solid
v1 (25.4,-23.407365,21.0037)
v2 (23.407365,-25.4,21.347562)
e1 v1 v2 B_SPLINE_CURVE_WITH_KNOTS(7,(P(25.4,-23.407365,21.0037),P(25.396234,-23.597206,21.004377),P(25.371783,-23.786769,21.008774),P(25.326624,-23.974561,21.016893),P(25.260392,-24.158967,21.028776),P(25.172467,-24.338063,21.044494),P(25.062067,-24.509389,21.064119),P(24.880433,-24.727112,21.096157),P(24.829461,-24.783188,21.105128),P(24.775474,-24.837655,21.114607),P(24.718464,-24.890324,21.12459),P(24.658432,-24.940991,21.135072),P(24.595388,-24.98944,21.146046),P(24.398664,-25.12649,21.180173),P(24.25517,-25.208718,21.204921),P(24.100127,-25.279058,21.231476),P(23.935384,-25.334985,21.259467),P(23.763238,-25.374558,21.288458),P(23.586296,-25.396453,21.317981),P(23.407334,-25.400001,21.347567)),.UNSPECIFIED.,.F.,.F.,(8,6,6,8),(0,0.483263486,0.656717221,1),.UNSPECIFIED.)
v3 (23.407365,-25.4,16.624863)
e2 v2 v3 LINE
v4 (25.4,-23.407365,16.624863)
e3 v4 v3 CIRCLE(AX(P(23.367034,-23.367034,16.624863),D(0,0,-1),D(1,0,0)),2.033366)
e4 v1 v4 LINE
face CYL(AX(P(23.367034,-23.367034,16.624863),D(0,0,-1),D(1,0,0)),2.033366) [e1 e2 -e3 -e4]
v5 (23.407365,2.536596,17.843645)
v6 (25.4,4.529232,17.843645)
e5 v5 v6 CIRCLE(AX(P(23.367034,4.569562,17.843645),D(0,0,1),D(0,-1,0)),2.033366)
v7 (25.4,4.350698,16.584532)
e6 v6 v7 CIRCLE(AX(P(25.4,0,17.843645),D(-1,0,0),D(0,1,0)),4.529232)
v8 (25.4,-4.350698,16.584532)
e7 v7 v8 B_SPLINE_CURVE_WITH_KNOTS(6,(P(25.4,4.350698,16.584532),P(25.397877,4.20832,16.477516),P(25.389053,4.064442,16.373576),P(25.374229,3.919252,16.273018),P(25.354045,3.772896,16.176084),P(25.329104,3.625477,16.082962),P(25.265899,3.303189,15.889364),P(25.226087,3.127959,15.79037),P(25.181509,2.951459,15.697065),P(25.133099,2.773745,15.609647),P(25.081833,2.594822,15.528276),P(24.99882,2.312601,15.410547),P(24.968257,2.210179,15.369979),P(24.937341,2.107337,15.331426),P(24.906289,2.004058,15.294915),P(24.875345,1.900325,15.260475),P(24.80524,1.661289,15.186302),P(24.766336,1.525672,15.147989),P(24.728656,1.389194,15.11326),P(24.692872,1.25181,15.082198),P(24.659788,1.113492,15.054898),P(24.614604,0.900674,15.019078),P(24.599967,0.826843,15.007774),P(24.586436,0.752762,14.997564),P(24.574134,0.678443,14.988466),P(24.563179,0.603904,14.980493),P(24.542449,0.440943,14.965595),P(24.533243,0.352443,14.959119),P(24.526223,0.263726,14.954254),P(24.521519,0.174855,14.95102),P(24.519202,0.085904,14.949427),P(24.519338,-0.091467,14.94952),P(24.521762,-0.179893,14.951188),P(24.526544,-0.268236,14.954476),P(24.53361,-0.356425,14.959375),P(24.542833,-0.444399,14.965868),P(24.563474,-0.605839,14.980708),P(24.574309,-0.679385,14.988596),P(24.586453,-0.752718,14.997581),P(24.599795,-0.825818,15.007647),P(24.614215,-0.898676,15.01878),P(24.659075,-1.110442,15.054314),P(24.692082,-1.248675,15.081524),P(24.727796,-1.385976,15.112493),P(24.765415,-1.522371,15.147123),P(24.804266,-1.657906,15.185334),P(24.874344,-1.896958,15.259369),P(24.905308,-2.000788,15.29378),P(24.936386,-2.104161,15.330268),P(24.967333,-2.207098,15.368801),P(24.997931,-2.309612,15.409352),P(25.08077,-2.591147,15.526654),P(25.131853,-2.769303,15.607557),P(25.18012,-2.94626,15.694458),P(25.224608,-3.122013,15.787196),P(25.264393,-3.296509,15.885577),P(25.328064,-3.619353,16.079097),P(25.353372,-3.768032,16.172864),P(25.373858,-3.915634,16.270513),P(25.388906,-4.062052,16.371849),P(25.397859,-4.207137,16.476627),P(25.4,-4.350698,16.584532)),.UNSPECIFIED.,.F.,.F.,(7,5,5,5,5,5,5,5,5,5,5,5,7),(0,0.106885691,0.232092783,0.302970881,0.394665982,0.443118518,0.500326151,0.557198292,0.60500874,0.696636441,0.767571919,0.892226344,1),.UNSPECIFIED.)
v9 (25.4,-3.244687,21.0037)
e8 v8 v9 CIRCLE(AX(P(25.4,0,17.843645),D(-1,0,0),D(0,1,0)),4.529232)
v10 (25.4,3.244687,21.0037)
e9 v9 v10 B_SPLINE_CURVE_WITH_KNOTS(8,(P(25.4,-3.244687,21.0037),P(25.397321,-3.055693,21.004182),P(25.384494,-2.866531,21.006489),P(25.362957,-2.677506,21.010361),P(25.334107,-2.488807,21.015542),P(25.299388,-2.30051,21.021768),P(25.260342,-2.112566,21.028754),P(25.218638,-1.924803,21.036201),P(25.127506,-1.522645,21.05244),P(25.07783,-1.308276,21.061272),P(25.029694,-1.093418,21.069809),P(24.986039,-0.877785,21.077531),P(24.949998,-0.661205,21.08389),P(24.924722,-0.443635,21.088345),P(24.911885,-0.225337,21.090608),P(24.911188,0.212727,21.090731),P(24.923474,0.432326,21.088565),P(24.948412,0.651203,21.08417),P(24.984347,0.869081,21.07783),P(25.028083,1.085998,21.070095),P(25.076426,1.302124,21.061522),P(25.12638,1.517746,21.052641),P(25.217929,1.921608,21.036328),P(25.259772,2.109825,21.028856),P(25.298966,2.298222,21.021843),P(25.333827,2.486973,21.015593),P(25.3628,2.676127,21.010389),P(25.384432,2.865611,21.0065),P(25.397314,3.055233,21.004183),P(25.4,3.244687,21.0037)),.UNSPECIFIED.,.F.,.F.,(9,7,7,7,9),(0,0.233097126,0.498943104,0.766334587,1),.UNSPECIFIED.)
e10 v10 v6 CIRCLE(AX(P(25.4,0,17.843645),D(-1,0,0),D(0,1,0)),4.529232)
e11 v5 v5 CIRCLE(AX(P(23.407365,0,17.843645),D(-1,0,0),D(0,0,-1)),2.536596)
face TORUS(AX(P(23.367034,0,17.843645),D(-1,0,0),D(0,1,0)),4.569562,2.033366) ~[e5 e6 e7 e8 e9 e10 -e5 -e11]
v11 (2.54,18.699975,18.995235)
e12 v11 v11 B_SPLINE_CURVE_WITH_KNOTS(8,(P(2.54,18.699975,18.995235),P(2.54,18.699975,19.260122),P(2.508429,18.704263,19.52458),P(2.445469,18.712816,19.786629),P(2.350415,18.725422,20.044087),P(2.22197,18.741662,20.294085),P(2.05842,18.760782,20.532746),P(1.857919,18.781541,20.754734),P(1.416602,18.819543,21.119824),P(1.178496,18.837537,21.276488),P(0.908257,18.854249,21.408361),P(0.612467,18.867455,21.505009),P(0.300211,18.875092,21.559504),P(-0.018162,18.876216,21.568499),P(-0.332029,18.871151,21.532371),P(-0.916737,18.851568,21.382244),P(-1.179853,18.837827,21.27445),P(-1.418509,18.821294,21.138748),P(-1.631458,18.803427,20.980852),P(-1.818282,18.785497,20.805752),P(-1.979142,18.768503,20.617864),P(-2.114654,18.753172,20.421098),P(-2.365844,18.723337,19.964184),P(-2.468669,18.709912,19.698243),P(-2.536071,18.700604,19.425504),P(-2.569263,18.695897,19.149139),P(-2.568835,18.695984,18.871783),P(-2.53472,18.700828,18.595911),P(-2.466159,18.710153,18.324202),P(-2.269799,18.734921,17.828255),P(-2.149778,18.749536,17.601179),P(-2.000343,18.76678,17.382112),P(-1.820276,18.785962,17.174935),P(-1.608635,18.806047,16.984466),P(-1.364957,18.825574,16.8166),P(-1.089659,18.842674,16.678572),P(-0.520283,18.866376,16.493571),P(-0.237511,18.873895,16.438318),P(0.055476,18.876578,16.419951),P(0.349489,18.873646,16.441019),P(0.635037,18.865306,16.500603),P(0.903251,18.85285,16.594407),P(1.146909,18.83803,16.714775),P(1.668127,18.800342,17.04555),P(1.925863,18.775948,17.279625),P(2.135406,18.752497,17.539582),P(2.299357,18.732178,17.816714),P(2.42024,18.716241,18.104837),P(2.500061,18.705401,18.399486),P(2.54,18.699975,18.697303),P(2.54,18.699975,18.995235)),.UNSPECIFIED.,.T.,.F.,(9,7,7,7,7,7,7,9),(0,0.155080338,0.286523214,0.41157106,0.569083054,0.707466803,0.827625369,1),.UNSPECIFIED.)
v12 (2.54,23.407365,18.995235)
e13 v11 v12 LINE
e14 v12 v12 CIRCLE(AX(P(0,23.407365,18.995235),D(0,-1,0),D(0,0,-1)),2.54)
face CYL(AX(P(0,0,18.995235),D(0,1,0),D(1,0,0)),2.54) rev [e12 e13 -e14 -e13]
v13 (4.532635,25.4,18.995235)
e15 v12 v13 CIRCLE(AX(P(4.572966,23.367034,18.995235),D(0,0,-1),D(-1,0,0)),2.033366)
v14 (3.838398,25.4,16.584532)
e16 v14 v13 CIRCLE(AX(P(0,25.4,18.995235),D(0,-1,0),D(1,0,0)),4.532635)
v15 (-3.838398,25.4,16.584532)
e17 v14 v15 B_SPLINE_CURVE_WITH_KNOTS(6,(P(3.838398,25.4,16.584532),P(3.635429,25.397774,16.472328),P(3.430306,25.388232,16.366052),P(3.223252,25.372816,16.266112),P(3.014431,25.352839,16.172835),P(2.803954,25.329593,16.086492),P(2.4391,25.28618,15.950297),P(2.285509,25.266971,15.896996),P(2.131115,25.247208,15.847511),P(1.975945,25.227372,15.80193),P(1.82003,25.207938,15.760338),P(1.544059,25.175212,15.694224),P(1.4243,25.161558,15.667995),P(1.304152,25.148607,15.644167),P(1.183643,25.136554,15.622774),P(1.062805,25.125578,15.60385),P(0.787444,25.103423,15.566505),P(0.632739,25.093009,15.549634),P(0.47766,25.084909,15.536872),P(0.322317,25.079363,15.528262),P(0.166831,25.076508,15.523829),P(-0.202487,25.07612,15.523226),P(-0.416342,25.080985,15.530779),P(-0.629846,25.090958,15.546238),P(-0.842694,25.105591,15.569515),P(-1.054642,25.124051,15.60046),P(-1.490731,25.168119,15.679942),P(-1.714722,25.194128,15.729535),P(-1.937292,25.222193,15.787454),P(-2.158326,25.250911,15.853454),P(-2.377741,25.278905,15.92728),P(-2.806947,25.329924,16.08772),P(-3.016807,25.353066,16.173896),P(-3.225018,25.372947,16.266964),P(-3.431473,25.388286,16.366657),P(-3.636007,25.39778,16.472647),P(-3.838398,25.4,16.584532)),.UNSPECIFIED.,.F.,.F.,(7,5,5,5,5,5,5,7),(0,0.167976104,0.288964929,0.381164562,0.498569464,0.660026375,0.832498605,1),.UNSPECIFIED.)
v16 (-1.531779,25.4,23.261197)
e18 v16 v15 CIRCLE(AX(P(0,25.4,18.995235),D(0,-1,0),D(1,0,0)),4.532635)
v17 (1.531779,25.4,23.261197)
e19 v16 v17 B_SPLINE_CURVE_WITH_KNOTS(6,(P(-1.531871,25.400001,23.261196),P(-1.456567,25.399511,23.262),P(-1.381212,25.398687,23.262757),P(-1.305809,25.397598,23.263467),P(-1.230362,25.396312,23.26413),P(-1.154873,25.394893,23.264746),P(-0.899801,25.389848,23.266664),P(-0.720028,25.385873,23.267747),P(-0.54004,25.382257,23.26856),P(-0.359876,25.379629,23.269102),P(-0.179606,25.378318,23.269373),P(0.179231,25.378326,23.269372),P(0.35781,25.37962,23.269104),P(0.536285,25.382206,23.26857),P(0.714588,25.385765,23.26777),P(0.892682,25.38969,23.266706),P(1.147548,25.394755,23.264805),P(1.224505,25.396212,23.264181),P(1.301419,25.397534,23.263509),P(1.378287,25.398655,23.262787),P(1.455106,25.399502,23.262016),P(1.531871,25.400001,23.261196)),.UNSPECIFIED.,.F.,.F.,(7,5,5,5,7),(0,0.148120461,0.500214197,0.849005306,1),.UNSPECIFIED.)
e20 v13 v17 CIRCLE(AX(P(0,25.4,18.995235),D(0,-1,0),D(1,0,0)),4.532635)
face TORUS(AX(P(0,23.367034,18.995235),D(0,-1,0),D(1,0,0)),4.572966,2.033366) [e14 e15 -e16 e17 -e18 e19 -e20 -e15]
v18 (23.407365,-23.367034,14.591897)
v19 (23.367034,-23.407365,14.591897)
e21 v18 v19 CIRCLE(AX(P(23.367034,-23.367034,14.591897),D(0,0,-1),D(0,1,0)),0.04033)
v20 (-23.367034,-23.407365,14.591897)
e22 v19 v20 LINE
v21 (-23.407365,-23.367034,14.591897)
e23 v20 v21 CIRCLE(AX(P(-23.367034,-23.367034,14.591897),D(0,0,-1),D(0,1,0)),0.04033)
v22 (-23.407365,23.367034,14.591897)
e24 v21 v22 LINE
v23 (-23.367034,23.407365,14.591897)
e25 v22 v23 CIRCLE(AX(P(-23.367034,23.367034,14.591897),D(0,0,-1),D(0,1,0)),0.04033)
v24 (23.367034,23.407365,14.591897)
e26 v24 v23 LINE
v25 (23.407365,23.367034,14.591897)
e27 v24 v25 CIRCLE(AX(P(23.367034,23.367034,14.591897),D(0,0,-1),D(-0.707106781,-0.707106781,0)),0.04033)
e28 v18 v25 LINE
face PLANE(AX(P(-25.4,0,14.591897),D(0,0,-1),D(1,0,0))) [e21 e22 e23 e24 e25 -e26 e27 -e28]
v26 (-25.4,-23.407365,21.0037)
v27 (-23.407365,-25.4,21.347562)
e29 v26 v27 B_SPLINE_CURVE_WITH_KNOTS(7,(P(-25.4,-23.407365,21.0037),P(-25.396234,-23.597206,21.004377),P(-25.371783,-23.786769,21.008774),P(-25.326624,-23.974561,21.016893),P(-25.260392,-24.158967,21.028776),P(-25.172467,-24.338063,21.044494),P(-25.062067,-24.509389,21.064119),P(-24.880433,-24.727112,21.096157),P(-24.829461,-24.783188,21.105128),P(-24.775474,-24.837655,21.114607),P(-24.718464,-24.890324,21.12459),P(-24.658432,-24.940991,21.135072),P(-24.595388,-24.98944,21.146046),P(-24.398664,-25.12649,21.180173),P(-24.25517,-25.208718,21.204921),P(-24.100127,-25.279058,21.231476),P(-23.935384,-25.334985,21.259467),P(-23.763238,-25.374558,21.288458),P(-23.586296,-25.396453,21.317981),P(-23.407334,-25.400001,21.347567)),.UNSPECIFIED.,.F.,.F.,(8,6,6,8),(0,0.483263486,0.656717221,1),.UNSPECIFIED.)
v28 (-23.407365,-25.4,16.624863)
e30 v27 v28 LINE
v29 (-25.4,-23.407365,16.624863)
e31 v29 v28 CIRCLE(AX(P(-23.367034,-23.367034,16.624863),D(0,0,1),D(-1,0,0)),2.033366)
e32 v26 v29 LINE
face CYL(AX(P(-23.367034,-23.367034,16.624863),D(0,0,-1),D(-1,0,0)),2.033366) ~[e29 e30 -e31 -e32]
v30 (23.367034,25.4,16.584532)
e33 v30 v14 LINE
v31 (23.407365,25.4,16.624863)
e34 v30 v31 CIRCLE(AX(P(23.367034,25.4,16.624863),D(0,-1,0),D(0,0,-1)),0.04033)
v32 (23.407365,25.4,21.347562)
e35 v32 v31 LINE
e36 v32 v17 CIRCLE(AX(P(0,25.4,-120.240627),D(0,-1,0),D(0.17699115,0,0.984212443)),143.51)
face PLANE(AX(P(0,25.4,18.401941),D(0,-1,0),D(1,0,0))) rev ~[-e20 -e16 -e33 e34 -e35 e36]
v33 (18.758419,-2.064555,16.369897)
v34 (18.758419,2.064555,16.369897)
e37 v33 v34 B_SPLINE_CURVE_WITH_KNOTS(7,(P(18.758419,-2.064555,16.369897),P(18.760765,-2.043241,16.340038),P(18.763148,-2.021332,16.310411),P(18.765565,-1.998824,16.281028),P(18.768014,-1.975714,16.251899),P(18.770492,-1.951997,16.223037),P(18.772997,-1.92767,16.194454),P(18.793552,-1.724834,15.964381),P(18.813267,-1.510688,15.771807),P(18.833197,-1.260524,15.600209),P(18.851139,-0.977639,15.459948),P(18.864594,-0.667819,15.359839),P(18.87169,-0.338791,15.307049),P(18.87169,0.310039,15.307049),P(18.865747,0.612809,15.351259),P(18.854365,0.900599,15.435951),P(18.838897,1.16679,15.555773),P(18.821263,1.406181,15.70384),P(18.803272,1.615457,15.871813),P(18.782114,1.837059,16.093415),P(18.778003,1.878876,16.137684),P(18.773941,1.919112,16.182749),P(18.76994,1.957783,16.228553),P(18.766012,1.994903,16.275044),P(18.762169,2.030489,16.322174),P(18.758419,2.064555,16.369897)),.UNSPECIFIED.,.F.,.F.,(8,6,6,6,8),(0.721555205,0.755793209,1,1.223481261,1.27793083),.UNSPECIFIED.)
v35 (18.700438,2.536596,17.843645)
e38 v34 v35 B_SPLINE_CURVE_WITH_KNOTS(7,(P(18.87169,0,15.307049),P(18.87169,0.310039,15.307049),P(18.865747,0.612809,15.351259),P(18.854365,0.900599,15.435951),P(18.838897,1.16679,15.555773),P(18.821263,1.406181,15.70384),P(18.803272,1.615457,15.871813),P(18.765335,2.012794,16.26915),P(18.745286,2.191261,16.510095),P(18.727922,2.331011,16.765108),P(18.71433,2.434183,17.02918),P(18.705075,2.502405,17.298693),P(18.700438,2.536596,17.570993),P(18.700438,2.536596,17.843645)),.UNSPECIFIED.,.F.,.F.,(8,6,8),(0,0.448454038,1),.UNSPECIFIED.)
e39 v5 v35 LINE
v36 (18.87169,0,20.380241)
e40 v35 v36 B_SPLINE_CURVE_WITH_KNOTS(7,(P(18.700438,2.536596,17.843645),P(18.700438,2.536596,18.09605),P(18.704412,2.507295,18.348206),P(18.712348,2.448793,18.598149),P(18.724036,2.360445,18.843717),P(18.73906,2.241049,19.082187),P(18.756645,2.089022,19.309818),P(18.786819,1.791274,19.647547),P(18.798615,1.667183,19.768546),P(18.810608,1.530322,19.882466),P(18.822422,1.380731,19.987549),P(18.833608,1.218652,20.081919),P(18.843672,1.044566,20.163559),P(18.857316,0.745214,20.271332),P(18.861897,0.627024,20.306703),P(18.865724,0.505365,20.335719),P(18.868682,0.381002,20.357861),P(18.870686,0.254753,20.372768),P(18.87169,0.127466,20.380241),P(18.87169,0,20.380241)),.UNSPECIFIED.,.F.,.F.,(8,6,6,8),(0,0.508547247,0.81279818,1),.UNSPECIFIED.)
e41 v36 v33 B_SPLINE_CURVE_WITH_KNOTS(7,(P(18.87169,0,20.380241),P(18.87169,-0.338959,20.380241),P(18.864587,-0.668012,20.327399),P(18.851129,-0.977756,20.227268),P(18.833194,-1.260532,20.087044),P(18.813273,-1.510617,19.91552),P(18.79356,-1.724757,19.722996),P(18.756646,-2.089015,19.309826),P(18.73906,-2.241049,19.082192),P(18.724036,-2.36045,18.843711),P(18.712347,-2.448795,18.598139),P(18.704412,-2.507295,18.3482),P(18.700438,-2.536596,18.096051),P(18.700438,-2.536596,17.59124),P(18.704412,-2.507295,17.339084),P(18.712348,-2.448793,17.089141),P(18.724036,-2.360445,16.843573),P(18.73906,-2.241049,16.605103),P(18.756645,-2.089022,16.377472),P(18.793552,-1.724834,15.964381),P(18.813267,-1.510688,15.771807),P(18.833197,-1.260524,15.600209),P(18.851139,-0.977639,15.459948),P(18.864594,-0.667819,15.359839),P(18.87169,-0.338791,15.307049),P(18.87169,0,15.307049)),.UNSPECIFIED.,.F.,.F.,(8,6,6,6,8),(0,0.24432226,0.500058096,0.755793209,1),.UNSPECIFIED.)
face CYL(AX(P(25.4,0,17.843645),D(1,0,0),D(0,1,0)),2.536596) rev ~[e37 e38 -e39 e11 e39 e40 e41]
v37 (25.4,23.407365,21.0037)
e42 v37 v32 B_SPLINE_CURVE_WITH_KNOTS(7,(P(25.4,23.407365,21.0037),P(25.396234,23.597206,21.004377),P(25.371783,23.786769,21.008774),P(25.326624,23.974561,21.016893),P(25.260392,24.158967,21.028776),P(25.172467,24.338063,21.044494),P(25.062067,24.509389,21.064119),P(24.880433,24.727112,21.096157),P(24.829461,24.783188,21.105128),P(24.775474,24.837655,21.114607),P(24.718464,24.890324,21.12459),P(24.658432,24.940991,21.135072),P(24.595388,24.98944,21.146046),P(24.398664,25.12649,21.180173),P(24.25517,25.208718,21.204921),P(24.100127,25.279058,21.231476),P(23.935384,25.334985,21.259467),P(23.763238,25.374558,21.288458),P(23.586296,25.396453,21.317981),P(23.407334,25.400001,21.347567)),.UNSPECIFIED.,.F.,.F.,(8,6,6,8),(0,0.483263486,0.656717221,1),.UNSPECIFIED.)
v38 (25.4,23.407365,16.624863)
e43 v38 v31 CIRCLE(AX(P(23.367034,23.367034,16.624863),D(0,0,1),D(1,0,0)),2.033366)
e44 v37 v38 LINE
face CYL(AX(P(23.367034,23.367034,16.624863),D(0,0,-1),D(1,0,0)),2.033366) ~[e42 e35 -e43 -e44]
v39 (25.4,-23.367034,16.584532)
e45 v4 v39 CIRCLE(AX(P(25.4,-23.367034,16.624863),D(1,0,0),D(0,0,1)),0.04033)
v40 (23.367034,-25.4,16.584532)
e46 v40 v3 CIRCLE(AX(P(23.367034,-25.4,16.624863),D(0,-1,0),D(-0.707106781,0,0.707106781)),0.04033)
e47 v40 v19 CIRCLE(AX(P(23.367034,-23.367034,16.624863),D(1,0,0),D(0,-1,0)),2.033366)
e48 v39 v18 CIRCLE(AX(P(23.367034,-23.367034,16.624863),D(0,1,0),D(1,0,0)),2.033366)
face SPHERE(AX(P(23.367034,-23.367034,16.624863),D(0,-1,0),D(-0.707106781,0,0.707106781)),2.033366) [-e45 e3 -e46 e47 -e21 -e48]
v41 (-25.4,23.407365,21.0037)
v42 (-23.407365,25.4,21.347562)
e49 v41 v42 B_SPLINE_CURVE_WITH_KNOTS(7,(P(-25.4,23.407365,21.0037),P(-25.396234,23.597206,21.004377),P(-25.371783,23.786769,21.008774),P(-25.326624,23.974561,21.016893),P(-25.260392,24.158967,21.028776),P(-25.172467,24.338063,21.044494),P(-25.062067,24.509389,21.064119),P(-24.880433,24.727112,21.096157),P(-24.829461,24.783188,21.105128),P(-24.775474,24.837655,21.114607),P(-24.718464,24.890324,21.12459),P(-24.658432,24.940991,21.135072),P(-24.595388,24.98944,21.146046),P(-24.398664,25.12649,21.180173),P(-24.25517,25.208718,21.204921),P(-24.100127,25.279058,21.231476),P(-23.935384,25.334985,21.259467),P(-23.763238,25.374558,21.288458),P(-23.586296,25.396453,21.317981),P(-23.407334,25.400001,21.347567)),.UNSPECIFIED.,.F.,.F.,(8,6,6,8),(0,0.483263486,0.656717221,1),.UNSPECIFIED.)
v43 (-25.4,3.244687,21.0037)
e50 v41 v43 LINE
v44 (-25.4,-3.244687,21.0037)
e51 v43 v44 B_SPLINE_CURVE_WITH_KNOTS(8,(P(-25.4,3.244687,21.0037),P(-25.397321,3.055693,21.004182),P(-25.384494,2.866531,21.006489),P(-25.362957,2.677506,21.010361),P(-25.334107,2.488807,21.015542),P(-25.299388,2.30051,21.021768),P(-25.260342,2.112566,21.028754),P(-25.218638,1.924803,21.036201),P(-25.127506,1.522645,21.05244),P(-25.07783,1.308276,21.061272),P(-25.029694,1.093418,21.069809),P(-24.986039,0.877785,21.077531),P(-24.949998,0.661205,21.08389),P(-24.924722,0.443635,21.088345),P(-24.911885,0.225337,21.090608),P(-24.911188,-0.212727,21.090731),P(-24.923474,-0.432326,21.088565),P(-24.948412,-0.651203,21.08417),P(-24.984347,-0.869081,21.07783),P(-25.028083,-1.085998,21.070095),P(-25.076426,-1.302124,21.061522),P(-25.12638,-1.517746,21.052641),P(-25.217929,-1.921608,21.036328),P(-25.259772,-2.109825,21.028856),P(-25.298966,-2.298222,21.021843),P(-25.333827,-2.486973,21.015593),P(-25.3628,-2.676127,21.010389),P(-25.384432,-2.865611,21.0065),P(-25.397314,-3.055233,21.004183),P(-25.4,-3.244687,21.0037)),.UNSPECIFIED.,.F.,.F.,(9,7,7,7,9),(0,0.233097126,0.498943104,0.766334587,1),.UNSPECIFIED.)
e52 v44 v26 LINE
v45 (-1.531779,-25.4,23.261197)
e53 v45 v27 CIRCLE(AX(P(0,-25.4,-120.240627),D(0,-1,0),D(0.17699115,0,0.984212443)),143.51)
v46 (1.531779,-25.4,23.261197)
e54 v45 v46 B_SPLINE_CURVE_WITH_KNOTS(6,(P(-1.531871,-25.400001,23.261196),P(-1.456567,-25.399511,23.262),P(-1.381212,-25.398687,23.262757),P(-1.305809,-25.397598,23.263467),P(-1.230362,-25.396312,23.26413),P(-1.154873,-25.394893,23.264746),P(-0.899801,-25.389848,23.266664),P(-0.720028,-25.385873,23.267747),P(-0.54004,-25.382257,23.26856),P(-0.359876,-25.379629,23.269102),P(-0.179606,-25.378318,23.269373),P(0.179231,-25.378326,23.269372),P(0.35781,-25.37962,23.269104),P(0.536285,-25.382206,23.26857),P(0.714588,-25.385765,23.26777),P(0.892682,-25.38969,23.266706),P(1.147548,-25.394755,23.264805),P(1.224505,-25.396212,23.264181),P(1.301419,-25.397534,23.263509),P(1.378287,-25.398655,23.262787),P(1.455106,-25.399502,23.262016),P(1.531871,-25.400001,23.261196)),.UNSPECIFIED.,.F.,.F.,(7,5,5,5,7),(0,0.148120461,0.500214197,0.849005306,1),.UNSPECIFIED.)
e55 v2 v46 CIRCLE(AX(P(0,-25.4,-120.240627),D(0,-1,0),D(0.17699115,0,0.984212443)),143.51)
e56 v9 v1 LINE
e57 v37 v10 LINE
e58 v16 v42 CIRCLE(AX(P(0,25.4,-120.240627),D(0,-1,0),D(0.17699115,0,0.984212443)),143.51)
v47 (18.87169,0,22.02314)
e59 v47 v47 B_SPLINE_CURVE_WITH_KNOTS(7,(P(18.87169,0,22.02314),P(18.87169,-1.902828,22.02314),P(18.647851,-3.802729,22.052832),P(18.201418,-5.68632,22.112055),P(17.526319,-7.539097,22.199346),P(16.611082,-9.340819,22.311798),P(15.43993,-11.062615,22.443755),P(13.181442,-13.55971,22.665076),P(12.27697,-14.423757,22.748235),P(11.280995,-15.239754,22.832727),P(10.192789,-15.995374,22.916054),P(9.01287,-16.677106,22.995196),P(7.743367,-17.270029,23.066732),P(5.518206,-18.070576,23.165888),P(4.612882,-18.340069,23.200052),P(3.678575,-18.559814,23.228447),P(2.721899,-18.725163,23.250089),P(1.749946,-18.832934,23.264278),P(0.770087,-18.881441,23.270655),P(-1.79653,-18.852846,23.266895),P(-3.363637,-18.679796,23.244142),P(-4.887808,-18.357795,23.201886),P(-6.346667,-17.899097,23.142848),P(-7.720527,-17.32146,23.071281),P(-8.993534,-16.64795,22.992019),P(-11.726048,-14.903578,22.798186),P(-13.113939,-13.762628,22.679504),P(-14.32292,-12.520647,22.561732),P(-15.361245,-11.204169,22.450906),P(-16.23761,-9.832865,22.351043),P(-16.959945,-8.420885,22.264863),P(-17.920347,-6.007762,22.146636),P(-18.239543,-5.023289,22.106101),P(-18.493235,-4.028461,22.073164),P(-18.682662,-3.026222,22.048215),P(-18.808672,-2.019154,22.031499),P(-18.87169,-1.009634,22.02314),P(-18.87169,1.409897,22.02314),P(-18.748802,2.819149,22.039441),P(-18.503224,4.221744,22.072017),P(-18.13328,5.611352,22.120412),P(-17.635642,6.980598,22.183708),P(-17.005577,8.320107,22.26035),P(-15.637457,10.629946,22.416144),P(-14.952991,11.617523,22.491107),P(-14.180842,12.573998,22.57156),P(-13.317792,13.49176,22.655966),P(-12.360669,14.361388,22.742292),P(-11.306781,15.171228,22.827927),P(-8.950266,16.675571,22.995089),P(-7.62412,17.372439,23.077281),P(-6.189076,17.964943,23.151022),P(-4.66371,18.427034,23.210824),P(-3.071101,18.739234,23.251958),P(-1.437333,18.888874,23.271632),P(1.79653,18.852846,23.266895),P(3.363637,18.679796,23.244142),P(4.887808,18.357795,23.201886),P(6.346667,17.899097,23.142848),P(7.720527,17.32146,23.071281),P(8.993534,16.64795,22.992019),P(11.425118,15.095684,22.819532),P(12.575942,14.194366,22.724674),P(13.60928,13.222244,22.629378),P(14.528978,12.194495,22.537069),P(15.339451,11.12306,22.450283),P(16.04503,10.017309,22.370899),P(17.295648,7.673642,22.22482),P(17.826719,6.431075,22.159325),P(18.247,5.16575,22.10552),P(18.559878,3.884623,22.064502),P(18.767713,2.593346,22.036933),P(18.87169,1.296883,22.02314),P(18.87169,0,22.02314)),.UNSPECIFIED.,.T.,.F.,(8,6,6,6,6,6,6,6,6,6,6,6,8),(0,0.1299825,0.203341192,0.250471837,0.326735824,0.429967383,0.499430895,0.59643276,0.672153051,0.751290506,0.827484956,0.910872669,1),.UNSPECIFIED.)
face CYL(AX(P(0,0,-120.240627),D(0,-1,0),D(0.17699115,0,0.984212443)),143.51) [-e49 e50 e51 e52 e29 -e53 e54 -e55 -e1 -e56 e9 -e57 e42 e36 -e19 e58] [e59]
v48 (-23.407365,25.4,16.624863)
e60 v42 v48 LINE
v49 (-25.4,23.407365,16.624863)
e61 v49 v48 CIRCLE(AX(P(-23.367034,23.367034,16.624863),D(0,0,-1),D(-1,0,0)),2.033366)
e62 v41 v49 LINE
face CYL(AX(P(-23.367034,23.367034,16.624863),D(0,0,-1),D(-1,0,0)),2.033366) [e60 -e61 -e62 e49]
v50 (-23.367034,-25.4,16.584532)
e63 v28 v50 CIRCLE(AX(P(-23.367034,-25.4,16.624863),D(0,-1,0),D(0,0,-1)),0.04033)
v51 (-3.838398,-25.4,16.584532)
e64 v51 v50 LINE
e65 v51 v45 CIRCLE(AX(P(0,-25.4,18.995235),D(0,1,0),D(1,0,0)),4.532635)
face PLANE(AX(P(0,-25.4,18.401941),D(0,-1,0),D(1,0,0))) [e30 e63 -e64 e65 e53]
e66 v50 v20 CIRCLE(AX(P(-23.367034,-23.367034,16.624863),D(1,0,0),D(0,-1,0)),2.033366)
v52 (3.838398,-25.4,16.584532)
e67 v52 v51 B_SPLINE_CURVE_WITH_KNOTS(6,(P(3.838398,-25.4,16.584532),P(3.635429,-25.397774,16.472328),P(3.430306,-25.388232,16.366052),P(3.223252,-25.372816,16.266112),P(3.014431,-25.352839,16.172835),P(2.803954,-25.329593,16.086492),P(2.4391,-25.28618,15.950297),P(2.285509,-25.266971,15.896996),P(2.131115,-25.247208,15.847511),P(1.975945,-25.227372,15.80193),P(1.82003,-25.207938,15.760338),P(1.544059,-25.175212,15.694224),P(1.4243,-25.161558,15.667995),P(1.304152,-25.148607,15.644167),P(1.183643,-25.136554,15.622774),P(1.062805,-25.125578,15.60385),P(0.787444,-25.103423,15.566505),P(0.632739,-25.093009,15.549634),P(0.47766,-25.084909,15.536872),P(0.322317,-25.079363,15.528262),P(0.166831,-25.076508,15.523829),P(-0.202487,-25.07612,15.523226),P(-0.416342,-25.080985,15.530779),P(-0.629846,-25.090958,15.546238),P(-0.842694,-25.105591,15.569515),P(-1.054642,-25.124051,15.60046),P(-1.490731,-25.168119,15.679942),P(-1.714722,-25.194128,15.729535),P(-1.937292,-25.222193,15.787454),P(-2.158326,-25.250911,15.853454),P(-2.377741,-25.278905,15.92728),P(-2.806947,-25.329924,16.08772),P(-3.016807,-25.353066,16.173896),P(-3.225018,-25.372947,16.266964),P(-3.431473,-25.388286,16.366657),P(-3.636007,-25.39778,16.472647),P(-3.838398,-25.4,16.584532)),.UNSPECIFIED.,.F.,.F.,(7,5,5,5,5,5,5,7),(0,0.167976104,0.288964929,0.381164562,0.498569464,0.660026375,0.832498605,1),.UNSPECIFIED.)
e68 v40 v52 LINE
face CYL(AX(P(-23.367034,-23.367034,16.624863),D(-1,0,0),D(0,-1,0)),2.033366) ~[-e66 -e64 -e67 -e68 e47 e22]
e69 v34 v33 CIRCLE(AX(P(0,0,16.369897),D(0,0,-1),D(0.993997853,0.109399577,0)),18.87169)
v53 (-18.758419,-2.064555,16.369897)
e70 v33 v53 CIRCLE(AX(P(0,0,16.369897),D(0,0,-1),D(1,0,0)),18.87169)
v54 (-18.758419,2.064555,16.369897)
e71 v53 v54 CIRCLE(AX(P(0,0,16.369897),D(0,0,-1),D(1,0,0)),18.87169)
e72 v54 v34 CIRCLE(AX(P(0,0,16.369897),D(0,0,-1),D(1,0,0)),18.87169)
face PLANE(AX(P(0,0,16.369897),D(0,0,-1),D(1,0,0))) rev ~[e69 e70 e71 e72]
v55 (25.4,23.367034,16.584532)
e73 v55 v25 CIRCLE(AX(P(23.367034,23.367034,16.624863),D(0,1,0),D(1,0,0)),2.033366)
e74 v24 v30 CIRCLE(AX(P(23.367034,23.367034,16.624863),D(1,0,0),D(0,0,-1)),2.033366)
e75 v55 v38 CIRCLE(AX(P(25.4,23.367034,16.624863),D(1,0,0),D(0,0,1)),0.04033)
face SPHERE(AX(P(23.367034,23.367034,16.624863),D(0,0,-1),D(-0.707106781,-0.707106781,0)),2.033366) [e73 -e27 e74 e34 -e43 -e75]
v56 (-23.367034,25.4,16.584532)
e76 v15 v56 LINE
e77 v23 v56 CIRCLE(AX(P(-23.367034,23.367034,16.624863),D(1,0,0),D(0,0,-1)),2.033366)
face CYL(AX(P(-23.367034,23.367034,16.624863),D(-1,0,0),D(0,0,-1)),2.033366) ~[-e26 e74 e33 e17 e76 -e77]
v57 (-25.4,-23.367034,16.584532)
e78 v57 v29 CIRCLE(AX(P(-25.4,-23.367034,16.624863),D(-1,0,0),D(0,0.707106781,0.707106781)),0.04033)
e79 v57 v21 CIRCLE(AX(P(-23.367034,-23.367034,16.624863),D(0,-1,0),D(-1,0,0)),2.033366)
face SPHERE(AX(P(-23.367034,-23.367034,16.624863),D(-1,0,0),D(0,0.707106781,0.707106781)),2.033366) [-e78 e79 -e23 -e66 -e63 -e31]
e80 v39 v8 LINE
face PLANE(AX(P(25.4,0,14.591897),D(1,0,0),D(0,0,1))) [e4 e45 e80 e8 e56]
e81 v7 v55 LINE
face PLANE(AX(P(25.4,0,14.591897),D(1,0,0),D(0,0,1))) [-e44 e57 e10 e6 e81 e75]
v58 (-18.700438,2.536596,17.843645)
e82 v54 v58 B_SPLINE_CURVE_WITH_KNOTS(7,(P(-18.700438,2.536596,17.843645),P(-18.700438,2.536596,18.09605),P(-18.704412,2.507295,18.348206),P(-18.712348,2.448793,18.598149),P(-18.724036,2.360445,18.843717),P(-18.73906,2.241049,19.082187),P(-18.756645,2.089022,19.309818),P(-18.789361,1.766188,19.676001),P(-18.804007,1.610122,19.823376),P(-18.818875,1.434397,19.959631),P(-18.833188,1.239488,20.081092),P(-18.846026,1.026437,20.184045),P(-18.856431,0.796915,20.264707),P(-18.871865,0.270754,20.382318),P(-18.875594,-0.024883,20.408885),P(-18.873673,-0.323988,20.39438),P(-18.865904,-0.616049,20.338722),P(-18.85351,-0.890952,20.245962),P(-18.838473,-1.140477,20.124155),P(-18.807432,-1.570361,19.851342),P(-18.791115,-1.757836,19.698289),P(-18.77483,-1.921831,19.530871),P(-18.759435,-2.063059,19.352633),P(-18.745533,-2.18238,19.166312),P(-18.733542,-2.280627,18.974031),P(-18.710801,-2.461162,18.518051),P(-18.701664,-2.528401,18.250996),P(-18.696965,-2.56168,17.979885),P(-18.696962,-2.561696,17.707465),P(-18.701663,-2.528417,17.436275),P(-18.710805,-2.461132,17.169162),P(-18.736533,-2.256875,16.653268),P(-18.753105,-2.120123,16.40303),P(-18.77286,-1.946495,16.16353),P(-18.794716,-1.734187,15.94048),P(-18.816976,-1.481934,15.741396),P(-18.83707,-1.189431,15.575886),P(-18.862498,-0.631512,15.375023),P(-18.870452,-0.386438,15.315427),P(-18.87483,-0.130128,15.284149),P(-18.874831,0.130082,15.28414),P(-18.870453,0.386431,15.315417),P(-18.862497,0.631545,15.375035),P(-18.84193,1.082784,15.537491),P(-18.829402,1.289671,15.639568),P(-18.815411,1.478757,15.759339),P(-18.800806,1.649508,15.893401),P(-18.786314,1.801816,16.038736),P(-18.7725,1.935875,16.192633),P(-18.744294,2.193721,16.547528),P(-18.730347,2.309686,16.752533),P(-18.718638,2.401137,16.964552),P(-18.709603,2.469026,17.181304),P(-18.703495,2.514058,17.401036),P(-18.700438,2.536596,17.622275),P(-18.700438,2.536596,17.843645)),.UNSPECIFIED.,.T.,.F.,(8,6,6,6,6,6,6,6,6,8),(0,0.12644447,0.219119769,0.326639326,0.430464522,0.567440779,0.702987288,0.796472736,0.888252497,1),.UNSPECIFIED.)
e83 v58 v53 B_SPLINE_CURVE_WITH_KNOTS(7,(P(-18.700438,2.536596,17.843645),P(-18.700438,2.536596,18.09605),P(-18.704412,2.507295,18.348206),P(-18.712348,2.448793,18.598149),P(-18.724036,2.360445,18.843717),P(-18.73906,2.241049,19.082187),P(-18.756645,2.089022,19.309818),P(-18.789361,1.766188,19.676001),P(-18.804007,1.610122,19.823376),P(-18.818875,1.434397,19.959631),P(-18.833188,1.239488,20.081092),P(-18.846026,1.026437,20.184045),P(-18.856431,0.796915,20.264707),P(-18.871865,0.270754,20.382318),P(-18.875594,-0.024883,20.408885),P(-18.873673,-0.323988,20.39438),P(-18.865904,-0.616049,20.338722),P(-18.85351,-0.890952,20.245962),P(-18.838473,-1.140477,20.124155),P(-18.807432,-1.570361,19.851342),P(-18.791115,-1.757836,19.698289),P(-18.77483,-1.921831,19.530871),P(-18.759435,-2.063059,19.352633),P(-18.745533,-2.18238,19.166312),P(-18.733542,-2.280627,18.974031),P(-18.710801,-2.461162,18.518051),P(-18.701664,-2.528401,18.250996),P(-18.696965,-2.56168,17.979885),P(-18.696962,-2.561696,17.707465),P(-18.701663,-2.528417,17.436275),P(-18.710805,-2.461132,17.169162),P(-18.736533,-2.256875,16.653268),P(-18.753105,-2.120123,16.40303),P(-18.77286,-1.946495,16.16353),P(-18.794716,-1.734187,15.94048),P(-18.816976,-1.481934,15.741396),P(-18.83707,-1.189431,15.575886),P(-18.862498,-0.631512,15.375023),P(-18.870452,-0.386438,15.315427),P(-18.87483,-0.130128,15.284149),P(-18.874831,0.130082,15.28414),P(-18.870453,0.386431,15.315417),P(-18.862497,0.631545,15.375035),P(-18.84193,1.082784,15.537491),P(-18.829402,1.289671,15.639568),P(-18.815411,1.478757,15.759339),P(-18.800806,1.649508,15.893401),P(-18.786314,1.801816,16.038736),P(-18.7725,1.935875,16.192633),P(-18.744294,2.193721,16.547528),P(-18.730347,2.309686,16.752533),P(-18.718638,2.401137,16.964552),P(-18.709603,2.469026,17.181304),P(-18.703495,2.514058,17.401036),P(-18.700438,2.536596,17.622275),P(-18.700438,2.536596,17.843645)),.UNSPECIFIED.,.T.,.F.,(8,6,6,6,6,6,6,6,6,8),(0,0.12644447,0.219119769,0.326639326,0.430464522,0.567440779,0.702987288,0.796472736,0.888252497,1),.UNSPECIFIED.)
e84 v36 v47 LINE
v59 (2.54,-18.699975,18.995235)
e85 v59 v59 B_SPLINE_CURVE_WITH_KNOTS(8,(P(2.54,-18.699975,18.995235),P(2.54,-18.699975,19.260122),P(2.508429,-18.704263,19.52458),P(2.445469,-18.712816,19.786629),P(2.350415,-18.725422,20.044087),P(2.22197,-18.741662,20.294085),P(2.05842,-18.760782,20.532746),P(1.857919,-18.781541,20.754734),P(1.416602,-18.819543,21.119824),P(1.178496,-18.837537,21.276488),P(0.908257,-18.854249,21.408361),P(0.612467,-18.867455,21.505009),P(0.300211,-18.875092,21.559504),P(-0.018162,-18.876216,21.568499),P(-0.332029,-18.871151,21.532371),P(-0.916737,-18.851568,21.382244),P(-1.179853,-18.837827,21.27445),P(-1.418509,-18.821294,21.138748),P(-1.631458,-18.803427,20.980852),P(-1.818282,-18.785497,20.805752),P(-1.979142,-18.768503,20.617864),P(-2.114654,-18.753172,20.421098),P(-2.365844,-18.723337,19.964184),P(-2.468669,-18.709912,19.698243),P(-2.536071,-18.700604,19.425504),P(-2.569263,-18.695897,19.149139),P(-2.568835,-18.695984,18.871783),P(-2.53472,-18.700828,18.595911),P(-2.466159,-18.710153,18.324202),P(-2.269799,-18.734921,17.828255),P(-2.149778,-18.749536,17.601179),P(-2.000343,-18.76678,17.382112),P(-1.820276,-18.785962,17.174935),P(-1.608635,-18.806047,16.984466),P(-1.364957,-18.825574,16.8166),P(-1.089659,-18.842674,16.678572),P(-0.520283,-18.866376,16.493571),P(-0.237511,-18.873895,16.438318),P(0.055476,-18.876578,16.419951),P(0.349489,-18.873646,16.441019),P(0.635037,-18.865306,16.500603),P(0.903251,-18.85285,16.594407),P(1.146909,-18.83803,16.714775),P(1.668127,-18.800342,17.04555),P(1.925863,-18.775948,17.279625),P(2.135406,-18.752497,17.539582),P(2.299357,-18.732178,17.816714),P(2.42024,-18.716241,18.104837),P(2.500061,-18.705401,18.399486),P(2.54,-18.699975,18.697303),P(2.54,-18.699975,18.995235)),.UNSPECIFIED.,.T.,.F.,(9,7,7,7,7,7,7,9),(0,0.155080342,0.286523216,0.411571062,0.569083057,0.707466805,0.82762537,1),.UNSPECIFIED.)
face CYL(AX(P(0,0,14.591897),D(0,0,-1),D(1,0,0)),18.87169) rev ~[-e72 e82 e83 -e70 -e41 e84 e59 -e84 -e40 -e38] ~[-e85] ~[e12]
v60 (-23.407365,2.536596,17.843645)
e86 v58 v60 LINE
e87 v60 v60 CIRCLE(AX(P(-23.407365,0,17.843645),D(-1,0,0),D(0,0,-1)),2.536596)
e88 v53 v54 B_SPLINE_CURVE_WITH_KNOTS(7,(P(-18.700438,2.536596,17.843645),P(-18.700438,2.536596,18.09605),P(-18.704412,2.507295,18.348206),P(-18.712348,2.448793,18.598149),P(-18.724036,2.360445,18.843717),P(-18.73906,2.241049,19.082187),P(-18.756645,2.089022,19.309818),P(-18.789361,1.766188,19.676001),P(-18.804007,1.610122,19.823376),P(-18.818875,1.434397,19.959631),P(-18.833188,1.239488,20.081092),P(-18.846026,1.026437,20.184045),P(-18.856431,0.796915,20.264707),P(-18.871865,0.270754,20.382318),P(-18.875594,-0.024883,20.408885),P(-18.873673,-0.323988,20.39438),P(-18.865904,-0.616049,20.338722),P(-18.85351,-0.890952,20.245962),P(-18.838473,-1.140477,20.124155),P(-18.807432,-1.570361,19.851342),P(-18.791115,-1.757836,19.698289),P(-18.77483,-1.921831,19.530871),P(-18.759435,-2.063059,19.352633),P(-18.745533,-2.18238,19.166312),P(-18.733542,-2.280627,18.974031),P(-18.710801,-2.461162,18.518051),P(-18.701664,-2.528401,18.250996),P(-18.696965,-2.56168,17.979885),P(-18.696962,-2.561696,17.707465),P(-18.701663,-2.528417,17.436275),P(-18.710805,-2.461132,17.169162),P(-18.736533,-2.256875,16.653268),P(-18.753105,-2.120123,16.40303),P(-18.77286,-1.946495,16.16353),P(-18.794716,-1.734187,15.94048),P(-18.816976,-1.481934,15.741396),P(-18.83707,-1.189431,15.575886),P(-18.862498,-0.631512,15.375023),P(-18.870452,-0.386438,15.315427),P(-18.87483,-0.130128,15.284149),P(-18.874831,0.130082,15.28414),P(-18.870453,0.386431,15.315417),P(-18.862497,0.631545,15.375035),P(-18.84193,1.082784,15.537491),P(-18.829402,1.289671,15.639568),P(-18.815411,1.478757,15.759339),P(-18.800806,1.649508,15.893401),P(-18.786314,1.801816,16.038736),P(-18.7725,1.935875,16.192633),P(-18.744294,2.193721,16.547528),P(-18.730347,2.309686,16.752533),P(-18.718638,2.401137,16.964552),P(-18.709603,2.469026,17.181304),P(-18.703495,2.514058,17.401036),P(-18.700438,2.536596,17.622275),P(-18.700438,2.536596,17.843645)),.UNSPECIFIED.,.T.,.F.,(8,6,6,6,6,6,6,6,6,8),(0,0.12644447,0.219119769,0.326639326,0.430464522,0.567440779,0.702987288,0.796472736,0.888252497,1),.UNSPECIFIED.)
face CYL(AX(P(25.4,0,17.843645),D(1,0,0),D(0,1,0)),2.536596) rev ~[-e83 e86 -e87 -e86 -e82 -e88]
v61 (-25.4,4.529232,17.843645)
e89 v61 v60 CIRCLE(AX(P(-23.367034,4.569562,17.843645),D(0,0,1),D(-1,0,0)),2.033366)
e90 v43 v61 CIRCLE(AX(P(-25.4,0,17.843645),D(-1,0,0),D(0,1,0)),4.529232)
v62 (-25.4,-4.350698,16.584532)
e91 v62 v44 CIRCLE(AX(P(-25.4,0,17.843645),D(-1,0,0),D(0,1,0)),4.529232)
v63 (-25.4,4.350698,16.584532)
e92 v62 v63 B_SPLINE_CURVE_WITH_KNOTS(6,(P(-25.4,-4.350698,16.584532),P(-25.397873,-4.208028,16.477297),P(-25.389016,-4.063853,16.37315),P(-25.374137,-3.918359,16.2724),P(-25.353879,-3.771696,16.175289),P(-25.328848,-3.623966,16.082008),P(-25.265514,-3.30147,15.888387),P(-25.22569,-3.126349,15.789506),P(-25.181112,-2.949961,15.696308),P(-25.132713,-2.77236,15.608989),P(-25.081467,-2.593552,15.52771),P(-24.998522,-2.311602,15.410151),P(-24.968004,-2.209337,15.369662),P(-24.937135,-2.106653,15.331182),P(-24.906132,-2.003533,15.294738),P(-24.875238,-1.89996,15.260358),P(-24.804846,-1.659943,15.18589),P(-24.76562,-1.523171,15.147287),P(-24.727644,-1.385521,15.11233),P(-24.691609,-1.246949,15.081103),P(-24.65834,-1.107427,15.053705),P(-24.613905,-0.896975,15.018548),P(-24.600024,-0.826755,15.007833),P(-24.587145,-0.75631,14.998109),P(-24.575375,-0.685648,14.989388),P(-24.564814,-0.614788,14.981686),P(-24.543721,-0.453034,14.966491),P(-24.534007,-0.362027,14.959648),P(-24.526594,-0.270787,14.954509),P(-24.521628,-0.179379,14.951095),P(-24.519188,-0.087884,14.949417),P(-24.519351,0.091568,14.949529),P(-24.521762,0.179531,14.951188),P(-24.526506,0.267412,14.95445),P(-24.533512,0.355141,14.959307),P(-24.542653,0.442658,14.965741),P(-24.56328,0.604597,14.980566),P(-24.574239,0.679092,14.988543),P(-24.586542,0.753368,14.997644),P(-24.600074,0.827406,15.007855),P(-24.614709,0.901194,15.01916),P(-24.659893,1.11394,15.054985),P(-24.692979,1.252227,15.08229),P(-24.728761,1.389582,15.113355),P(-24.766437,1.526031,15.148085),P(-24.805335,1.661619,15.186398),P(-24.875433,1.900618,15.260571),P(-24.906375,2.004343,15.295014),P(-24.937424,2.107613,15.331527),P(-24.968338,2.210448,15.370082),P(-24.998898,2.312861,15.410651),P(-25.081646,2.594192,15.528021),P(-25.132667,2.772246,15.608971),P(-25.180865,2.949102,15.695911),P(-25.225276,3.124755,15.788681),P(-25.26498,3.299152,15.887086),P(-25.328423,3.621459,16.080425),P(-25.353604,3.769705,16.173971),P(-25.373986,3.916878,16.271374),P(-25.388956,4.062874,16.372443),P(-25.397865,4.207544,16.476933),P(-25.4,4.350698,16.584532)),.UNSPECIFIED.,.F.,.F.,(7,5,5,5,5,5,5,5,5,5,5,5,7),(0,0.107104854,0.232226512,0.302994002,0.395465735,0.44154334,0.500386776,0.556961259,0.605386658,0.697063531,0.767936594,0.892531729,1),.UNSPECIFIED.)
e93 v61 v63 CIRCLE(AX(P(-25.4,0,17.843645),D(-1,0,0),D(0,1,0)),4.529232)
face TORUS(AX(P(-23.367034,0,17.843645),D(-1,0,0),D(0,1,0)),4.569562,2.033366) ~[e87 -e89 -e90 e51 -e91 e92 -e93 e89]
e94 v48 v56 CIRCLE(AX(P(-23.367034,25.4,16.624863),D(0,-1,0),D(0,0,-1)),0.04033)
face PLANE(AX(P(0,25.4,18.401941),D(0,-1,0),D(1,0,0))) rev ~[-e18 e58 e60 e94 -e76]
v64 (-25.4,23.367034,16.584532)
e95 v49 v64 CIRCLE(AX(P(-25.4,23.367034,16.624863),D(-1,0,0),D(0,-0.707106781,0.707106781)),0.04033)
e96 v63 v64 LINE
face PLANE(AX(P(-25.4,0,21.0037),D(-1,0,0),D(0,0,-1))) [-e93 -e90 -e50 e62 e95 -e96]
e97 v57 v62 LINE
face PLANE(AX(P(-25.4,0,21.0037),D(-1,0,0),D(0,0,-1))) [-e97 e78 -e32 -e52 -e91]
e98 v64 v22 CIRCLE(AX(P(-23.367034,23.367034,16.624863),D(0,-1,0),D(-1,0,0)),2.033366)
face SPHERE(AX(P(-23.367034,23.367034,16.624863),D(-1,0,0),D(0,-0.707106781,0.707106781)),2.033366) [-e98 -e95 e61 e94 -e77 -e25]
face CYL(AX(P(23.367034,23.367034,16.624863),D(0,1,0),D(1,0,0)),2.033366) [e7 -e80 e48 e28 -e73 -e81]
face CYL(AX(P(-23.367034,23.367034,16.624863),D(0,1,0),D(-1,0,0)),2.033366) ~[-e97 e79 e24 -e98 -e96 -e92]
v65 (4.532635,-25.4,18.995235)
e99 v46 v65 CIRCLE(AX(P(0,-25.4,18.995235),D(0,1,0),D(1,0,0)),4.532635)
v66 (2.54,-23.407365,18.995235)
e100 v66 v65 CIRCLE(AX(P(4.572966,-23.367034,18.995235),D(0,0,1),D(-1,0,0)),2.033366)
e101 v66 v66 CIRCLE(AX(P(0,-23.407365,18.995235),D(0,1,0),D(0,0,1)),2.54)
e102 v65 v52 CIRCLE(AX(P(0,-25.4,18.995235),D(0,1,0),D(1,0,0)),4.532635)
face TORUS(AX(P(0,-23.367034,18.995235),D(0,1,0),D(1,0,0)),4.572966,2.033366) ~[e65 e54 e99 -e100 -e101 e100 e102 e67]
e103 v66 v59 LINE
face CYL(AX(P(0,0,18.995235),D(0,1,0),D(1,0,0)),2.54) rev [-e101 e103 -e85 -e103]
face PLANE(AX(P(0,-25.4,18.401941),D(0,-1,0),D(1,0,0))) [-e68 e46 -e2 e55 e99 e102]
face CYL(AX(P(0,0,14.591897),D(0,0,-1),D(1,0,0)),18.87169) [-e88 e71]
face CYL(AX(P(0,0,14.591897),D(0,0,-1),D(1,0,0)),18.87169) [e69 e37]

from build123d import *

# Parameters (mm, degrees)
F0_R         = 2.54
F1_DEPTH     = 25.4
F2_R         = 2.5365962647
F3_DEPTH     = 60.706
F4_R         = 18.8716899986
F5_DEPTH     = 14.478
F6_DEPTH     = 1.778
F7_T1_DEPTH  = 46.7340686292
F7_T3_DEPTH  = 46.7340686292
F7_T5_DEPTH  = 9.4612519522
F7_S9_W      = 2.2367022539
F7_S9_H      = 2.2367022539
F7_T10_DEPTH = 2.236702254
F7_S15_W     = 2.2367022539
F7_S15_H     = 2.2367022539
F7_T16_DEPTH = 2.236702254
F7_S21_W     = 2.2367022539
F7_S21_H     = 2.2367022539
F7_T22_DEPTH = 2.236702254
F7_S27_W     = 2.2367022539
F7_S27_H     = 2.2367022539
F7_T28_DEPTH = 2.236702254


# Not quite as in the source:
# - a fillet or chamfer that OpenCascade refuses, or shapes differently, is made with other operations: its cross-section is extruded or revolved along the edge and cut away or added


with BuildPart() as f1:
    # F0 (on Front) → F1 (new body, symmetric)
    with BuildSketch(Plane.XZ):
        with BuildLine():
            Line((25.4, 14.5918969065), (25.4, 21.0037002322))
            ThreePointArc((25.4, 21.0037002322), (0, 23.2693725585), (-25.4, 21.0037002322))
            Line((-25.4, 21.0037002322), (-25.4, 14.5918969065))
            Line((-25.4, 14.5918969065), (25.4, 14.5918969065))
        make_face()
        with Locations((0, 18.9952347428)):
            Circle(F0_R, mode=Mode.SUBTRACT)
    extrude(amount=F1_DEPTH, both=True)

    # F2 (on face) → F3 (cut)
    with BuildSketch(Plane.YZ.offset(25.4)):
        with Locations((0, 17.843645066)):
            Circle(F2_R)
    extrude(amount=-F3_DEPTH, mode=Mode.SUBTRACT)

    # F4 (on face) → F5 (cut)
    with BuildSketch(Plane(origin=(0, 0, 14.5918969065), x_dir=(1, 0, 0), z_dir=(0, 0, -1))):
        Circle(F4_R)
    extrude(amount=-F5_DEPTH, mode=Mode.SUBTRACT)

    # F4 (on face) → F6 (join)
    with BuildSketch(Plane(origin=(0, 0, 14.5918969065), x_dir=(1, 0, 0), z_dir=(0, 0, -1))):
        Circle(F4_R)
    extrude(amount=-F6_DEPTH)

    # F7: fillet of radius 2.032 on 12 edges, made by hand

    # F7_s2 → F7_t1 (cut)
    with BuildSketch(Plane.XZ.offset(-23.3670343146)):
        with BuildLine():
            ThreePointArc((-25.4004, 16.6248625919), (-24.8048409794, 15.1870559271), (-23.3670343146, 14.5914969065))
            Line((-23.3670343146, 14.5914969065), (-23.3670343146, 14.388160338))
            ThreePointArc((-23.3670343146, 14.388160338), (-24.3835171573, 14.388560338), (-25.4, 14.388560338))
            Line((-25.4, 14.388560338), (-25.6033365685, 14.5918969065))
            ThreePointArc((-25.6033365685, 14.5918969065), (-25.6033365685, 15.6083797492), (-25.6037365685, 16.6248625919))
            Line((-25.6037365685, 16.6248625919), (-25.4004, 16.6248625919))
        make_face()
        with BuildLine():
            ThreePointArc((25.4004, 16.6248625919), (24.8048409794, 15.1870559271), (23.3670343146, 14.5914969065))
            Line((23.3670343146, 14.5914969065), (23.3670343146, 14.388160338))
            ThreePointArc((23.3670343146, 14.388160338), (24.3835171573, 14.388560338), (25.4, 14.388560338))
            Line((25.4, 14.388560338), (25.6033365685, 14.5918969065))
            ThreePointArc((25.6033365685, 14.5918969065), (25.6033365685, 15.6083797492), (25.6037365685, 16.6248625919))
            Line((25.6037365685, 16.6248625919), (25.4004, 16.6248625919))
        make_face()
    extrude(amount=F7_T1_DEPTH, mode=Mode.SUBTRACT)

    # F7_s4 → F7_t3 (cut)
    with BuildSketch(Plane.YZ.offset(-23.3670343146)):
        with BuildLine():
            ThreePointArc((23.3670343146, 14.5914969065), (24.8048409794, 15.1870559271), (25.4004, 16.6248625919))
            Line((25.4004, 16.6248625919), (25.6037365685, 16.6248625919))
            ThreePointArc((25.6037365685, 16.6248625919), (25.6033365685, 15.6083797492), (25.6033365685, 14.5918969065))
            Line((25.6033365685, 14.5918969065), (25.4, 14.388560338))
            ThreePointArc((25.4, 14.388560338), (24.3835171573, 14.388560338), (23.3670343146, 14.388160338))
            Line((23.3670343146, 14.388160338), (23.3670343146, 14.5914969065))
        make_face()
        with BuildLine():
            ThreePointArc((-25.4004, 16.6248625919), (-24.8048409794, 15.1870559271), (-23.3670343146, 14.5914969065))
            Line((-23.3670343146, 14.5914969065), (-23.3670343146, 14.388160338))
            ThreePointArc((-23.3670343146, 14.388160338), (-24.3835171573, 14.388560338), (-25.4, 14.388560338))
            Line((-25.4, 14.388560338), (-25.6033365685, 14.5918969065))
            ThreePointArc((-25.6033365685, 14.5918969065), (-25.6033365685, 15.6083797492), (-25.6037365685, 16.6248625919))
            Line((-25.6037365685, 16.6248625919), (-25.4004, 16.6248625919))
        make_face()
    extrude(amount=F7_T3_DEPTH, mode=Mode.SUBTRACT)

    # F7_s6 → F7_t5 (cut)
    with BuildSketch(Plane.XY.offset(16.6248625919)):
        with BuildLine():
            ThreePointArc((-25.4004, 23.3670343146), (-24.8048409794, 24.8048409794), (-23.3670343146, 25.4004))
            Line((-23.3670343146, 25.4004), (-23.3670343146, 25.6037365685))
            ThreePointArc((-23.3670343146, 25.6037365685), (-24.3835171573, 25.6033365685), (-25.4, 25.6033365685))
            Line((-25.4, 25.6033365685), (-25.6033365685, 25.4))
            ThreePointArc((-25.6033365685, 25.4), (-25.6033365685, 24.3835171573), (-25.6037365685, 23.3670343146))
            Line((-25.6037365685, 23.3670343146), (-25.4004, 23.3670343146))
        make_face()
        with BuildLine():
            ThreePointArc((-25.4004, -23.3670343146), (-24.8048409794, -24.8048409794), (-23.3670343146, -25.4004))
            Line((-23.3670343146, -25.4004), (-23.3670343146, -25.6037365685))
            ThreePointArc((-23.3670343146, -25.6037365685), (-24.3835171573, -25.6033365685), (-25.4, -25.6033365685))
            Line((-25.4, -25.6033365685), (-25.6033365685, -25.4))
            ThreePointArc((-25.6033365685, -25.4), (-25.6033365685, -24.3835171573), (-25.6037365685, -23.3670343146))
            Line((-25.6037365685, -23.3670343146), (-25.4004, -23.3670343146))
        make_face()
        with BuildLine():
            ThreePointArc((25.4004, -23.3670343146), (24.8048409794, -24.8048409794), (23.3670343146, -25.4004))
            Line((23.3670343146, -25.4004), (23.3670343146, -25.6037365685))
            ThreePointArc((23.3670343146, -25.6037365685), (24.3835171573, -25.6033365685), (25.4, -25.6033365685))
            Line((25.4, -25.6033365685), (25.6033365685, -25.4))
            ThreePointArc((25.6033365685, -25.4), (25.6033365685, -24.3835171573), (25.6037365685, -23.3670343146))
            Line((25.6037365685, -23.3670343146), (25.4004, -23.3670343146))
        make_face()
        with BuildLine():
            ThreePointArc((25.4004, 23.3670343146), (24.8048409794, 24.8048409794), (23.3670343146, 25.4004))
            Line((23.3670343146, 25.4004), (23.3670343146, 25.6037365685))
            ThreePointArc((23.3670343146, 25.6037365685), (24.3835171573, 25.6033365685), (25.4, 25.6033365685))
            Line((25.4, 25.6033365685), (25.6033365685, 25.4))
            ThreePointArc((25.6033365685, 25.4), (25.6033365685, 24.3835171573), (25.6037365685, 23.3670343146))
            Line((25.6037365685, 23.3670343146), (25.4004, 23.3670343146))
        make_face()
    extrude(amount=F7_T5_DEPTH, mode=Mode.SUBTRACT)


with BuildPart() as f7_tool8:
    # F7_s9 → F7_t10 (new body)
    with BuildSketch(Plane.YZ.offset(-23.3670343146)):
        with Locations((24.4853854416, 15.506511465)):
            Rectangle(F7_S9_W, F7_S9_H)
    extrude(amount=-F7_T10_DEPTH)

    # F7_s11 → F7_t12 (revolve, cut)
    with BuildSketch(Plane(origin=(-23.3670343146, 23.3670343146, 16.6248625919), x_dir=(0, -0.7071067812, 0.7071067812), z_dir=(0, -0.7071067812, -0.7071067812))):
        with BuildLine():
            ThreePointArc((0, -2.0333656854), (2.0333656854, 0), (0, 2.0333656854))
            Line((0, 2.0333656854), (0, -2.0333656854))
        make_face()
    revolve(axis=Axis((-23.3670343146, 23.3670343146, 16.6248625919), (-1, 0, 0)), mode=Mode.SUBTRACT)


with BuildPart() as f1_1:
    add(f1.part)

    # F7_t7: cut F7_tool8
    add(f7_tool8.part, mode=Mode.SUBTRACT)


with BuildPart() as f7_tool14:
    # F7_s15 → F7_t16 (new body)
    with BuildSketch(Plane.YZ.offset(-23.3670343146)):
        with Locations((-24.4853854416, 15.506511465)):
            Rectangle(F7_S15_W, F7_S15_H)
    extrude(amount=-F7_T16_DEPTH)

    # F7_s17 → F7_t18 (revolve, cut)
    with BuildSketch(Plane(origin=(-23.3670343146, -23.3670343146, 16.6248625919), x_dir=(0, 0.7071067812, 0.7071067812), z_dir=(0, -0.7071067812, 0.7071067812))):
        with BuildLine():
            ThreePointArc((0, -2.0333656854), (2.0333656854, 0), (0, 2.0333656854))
            Line((0, 2.0333656854), (0, -2.0333656854))
        make_face()
    revolve(axis=Axis((-23.3670343146, -23.3670343146, 16.6248625919), (-1, 0, 0)), mode=Mode.SUBTRACT)


with BuildPart() as f1_2:
    add(f1_1.part)

    # F7_t13: cut F7_tool14
    add(f7_tool14.part, mode=Mode.SUBTRACT)


with BuildPart() as f7_tool20:
    # F7_s21 → F7_t22 (new body)
    with BuildSketch(Plane.XY.offset(16.6248625919)):
        with Locations((24.4853854416, 24.4853854416)):
            Rectangle(F7_S21_W, F7_S21_H)
    extrude(amount=-F7_T22_DEPTH)

    # F7_s23 → F7_t24 (revolve, cut)
    with BuildSketch(Plane(origin=(23.3670343146, 23.3670343146, 16.6248625919), x_dir=(-0.7071067812, -0.7071067812, 0), z_dir=(0.7071067812, -0.7071067812, 0))):
        with BuildLine():
            ThreePointArc((0, -2.0333656854), (2.0333656854, 0), (0, 2.0333656854))
            Line((0, 2.0333656854), (0, -2.0333656854))
        make_face()
    revolve(axis=Axis((23.3670343146, 23.3670343146, 16.6248625919), (0, 0, -1)), mode=Mode.SUBTRACT)


with BuildPart() as f1_3:
    add(f1_2.part)

    # F7_t19: cut F7_tool20
    add(f7_tool20.part, mode=Mode.SUBTRACT)


with BuildPart() as f7_tool26:
    # F7_s27 → F7_t28 (new body)
    with BuildSketch(Plane.XZ.offset(23.3670343146)):
        with Locations((24.4853854416, 15.506511465)):
            Rectangle(F7_S27_W, F7_S27_H)
    extrude(amount=F7_T28_DEPTH)

    # F7_s29 → F7_t30 (revolve, cut)
    with BuildSketch(Plane(origin=(23.3670343146, -23.3670343146, 16.6248625919), x_dir=(-0.7071067812, 0, 0.7071067812), z_dir=(0.7071067812, 0, 0.7071067812))):
        with BuildLine():
            ThreePointArc((0, -2.0333656854), (2.0333656854, 0), (0, 2.0333656854))
            Line((0, 2.0333656854), (0, -2.0333656854))
        make_face()
    revolve(axis=Axis((23.3670343146, -23.3670343146, 16.6248625919), (0, -1, 0)), mode=Mode.SUBTRACT)


with BuildPart() as f1_4:
    add(f1_3.part)

    # F7_t25: cut F7_tool26
    add(f7_tool26.part, mode=Mode.SUBTRACT)

    # F7_s31 → F7_t32 (revolve, cut)
    with BuildSketch(Plane.XY.offset(18.9952347428)):
        with BuildLine():
            ThreePointArc((2.5396, 23.3670343146), (3.1351590206, 24.8048409794), (4.5729656854, 25.4004))
            Line((4.5729656854, 25.4004), (4.5729656854, 25.6037365685))
            ThreePointArc((4.5729656854, 25.6037365685), (3.5564828427, 25.6033365685), (2.54, 25.6033365685))
            Line((2.54, 25.6033365685), (2.3366634315, 25.4))
            ThreePointArc((2.3366634315, 25.4), (2.3366634315, 24.3835171573), (2.3362634315, 23.3670343146))
            Line((2.3362634315, 23.3670343146), (2.5396, 23.3670343146))
        make_face()
    revolve(axis=Axis((0, 25.4, 18.9952347428), (0, -1, 0)), mode=Mode.SUBTRACT)

    # F7_s33 → F7_t34 (revolve, cut)
    with BuildSketch(Plane.XY.offset(17.843645066)):
        with BuildLine():
            ThreePointArc((23.3670343146, 2.5361962647), (24.8048409794, 3.1317552853), (25.4004, 4.5695619501))
            Line((25.4004, 4.5695619501), (25.6037365685, 4.5695619501))
            ThreePointArc((25.6037365685, 4.5695619501), (25.6033365685, 3.5530791074), (25.6033365685, 2.5365962647))
            Line((25.6033365685, 2.5365962647), (25.4, 2.3332596961))
            ThreePointArc((25.4, 2.3332596961), (24.3835171573, 2.3332596961), (23.3670343146, 2.3328596961))
            Line((23.3670343146, 2.3328596961), (23.3670343146, 2.5361962647))
        make_face()
    revolve(axis=Axis((25.4, 0, 17.843645066), (1, 0, 0)), mode=Mode.SUBTRACT)

    # F7_s35 → F7_t36 (revolve, cut)
    with BuildSketch(Plane.XY.offset(18.9952347428)):
        with BuildLine():
            ThreePointArc((2.5396, -23.3670343146), (3.1351590206, -24.8048409794), (4.5729656854, -25.4004))
            Line((4.5729656854, -25.4004), (4.5729656854, -25.6037365685))
            ThreePointArc((4.5729656854, -25.6037365685), (3.5564828427, -25.6033365685), (2.54, -25.6033365685))
            Line((2.54, -25.6033365685), (2.3366634315, -25.4))
            ThreePointArc((2.3366634315, -25.4), (2.3366634315, -24.3835171573), (2.3362634315, -23.3670343146))
            Line((2.3362634315, -23.3670343146), (2.5396, -23.3670343146))
        make_face()
    revolve(axis=Axis((0, -25.4, 18.9952347428), (0, -1, 0)), mode=Mode.SUBTRACT)

    # F7_s37 → F7_t38 (revolve, cut)
    with BuildSketch(Plane.XY.offset(17.843645066)):
        with BuildLine():
            ThreePointArc((-25.4004, 4.5695619501), (-24.8048409794, 3.1317552853), (-23.3670343146, 2.5361962647))
            Line((-23.3670343146, 2.5361962647), (-23.3670343146, 2.3328596961))
            ThreePointArc((-23.3670343146, 2.3328596961), (-24.3835171573, 2.3332596961), (-25.4, 2.3332596961))
            Line((-25.4, 2.3332596961), (-25.6033365685, 2.5365962647))
            ThreePointArc((-25.6033365685, 2.5365962647), (-25.6033365685, 3.5530791074), (-25.6037365685, 4.5695619501))
            Line((-25.6037365685, 4.5695619501), (-25.4004, 4.5695619501))
        make_face()
    revolve(axis=Axis((-25.4, 0, 17.843645066), (1, 0, 0)), mode=Mode.SUBTRACT)


solid = f1_4.part
